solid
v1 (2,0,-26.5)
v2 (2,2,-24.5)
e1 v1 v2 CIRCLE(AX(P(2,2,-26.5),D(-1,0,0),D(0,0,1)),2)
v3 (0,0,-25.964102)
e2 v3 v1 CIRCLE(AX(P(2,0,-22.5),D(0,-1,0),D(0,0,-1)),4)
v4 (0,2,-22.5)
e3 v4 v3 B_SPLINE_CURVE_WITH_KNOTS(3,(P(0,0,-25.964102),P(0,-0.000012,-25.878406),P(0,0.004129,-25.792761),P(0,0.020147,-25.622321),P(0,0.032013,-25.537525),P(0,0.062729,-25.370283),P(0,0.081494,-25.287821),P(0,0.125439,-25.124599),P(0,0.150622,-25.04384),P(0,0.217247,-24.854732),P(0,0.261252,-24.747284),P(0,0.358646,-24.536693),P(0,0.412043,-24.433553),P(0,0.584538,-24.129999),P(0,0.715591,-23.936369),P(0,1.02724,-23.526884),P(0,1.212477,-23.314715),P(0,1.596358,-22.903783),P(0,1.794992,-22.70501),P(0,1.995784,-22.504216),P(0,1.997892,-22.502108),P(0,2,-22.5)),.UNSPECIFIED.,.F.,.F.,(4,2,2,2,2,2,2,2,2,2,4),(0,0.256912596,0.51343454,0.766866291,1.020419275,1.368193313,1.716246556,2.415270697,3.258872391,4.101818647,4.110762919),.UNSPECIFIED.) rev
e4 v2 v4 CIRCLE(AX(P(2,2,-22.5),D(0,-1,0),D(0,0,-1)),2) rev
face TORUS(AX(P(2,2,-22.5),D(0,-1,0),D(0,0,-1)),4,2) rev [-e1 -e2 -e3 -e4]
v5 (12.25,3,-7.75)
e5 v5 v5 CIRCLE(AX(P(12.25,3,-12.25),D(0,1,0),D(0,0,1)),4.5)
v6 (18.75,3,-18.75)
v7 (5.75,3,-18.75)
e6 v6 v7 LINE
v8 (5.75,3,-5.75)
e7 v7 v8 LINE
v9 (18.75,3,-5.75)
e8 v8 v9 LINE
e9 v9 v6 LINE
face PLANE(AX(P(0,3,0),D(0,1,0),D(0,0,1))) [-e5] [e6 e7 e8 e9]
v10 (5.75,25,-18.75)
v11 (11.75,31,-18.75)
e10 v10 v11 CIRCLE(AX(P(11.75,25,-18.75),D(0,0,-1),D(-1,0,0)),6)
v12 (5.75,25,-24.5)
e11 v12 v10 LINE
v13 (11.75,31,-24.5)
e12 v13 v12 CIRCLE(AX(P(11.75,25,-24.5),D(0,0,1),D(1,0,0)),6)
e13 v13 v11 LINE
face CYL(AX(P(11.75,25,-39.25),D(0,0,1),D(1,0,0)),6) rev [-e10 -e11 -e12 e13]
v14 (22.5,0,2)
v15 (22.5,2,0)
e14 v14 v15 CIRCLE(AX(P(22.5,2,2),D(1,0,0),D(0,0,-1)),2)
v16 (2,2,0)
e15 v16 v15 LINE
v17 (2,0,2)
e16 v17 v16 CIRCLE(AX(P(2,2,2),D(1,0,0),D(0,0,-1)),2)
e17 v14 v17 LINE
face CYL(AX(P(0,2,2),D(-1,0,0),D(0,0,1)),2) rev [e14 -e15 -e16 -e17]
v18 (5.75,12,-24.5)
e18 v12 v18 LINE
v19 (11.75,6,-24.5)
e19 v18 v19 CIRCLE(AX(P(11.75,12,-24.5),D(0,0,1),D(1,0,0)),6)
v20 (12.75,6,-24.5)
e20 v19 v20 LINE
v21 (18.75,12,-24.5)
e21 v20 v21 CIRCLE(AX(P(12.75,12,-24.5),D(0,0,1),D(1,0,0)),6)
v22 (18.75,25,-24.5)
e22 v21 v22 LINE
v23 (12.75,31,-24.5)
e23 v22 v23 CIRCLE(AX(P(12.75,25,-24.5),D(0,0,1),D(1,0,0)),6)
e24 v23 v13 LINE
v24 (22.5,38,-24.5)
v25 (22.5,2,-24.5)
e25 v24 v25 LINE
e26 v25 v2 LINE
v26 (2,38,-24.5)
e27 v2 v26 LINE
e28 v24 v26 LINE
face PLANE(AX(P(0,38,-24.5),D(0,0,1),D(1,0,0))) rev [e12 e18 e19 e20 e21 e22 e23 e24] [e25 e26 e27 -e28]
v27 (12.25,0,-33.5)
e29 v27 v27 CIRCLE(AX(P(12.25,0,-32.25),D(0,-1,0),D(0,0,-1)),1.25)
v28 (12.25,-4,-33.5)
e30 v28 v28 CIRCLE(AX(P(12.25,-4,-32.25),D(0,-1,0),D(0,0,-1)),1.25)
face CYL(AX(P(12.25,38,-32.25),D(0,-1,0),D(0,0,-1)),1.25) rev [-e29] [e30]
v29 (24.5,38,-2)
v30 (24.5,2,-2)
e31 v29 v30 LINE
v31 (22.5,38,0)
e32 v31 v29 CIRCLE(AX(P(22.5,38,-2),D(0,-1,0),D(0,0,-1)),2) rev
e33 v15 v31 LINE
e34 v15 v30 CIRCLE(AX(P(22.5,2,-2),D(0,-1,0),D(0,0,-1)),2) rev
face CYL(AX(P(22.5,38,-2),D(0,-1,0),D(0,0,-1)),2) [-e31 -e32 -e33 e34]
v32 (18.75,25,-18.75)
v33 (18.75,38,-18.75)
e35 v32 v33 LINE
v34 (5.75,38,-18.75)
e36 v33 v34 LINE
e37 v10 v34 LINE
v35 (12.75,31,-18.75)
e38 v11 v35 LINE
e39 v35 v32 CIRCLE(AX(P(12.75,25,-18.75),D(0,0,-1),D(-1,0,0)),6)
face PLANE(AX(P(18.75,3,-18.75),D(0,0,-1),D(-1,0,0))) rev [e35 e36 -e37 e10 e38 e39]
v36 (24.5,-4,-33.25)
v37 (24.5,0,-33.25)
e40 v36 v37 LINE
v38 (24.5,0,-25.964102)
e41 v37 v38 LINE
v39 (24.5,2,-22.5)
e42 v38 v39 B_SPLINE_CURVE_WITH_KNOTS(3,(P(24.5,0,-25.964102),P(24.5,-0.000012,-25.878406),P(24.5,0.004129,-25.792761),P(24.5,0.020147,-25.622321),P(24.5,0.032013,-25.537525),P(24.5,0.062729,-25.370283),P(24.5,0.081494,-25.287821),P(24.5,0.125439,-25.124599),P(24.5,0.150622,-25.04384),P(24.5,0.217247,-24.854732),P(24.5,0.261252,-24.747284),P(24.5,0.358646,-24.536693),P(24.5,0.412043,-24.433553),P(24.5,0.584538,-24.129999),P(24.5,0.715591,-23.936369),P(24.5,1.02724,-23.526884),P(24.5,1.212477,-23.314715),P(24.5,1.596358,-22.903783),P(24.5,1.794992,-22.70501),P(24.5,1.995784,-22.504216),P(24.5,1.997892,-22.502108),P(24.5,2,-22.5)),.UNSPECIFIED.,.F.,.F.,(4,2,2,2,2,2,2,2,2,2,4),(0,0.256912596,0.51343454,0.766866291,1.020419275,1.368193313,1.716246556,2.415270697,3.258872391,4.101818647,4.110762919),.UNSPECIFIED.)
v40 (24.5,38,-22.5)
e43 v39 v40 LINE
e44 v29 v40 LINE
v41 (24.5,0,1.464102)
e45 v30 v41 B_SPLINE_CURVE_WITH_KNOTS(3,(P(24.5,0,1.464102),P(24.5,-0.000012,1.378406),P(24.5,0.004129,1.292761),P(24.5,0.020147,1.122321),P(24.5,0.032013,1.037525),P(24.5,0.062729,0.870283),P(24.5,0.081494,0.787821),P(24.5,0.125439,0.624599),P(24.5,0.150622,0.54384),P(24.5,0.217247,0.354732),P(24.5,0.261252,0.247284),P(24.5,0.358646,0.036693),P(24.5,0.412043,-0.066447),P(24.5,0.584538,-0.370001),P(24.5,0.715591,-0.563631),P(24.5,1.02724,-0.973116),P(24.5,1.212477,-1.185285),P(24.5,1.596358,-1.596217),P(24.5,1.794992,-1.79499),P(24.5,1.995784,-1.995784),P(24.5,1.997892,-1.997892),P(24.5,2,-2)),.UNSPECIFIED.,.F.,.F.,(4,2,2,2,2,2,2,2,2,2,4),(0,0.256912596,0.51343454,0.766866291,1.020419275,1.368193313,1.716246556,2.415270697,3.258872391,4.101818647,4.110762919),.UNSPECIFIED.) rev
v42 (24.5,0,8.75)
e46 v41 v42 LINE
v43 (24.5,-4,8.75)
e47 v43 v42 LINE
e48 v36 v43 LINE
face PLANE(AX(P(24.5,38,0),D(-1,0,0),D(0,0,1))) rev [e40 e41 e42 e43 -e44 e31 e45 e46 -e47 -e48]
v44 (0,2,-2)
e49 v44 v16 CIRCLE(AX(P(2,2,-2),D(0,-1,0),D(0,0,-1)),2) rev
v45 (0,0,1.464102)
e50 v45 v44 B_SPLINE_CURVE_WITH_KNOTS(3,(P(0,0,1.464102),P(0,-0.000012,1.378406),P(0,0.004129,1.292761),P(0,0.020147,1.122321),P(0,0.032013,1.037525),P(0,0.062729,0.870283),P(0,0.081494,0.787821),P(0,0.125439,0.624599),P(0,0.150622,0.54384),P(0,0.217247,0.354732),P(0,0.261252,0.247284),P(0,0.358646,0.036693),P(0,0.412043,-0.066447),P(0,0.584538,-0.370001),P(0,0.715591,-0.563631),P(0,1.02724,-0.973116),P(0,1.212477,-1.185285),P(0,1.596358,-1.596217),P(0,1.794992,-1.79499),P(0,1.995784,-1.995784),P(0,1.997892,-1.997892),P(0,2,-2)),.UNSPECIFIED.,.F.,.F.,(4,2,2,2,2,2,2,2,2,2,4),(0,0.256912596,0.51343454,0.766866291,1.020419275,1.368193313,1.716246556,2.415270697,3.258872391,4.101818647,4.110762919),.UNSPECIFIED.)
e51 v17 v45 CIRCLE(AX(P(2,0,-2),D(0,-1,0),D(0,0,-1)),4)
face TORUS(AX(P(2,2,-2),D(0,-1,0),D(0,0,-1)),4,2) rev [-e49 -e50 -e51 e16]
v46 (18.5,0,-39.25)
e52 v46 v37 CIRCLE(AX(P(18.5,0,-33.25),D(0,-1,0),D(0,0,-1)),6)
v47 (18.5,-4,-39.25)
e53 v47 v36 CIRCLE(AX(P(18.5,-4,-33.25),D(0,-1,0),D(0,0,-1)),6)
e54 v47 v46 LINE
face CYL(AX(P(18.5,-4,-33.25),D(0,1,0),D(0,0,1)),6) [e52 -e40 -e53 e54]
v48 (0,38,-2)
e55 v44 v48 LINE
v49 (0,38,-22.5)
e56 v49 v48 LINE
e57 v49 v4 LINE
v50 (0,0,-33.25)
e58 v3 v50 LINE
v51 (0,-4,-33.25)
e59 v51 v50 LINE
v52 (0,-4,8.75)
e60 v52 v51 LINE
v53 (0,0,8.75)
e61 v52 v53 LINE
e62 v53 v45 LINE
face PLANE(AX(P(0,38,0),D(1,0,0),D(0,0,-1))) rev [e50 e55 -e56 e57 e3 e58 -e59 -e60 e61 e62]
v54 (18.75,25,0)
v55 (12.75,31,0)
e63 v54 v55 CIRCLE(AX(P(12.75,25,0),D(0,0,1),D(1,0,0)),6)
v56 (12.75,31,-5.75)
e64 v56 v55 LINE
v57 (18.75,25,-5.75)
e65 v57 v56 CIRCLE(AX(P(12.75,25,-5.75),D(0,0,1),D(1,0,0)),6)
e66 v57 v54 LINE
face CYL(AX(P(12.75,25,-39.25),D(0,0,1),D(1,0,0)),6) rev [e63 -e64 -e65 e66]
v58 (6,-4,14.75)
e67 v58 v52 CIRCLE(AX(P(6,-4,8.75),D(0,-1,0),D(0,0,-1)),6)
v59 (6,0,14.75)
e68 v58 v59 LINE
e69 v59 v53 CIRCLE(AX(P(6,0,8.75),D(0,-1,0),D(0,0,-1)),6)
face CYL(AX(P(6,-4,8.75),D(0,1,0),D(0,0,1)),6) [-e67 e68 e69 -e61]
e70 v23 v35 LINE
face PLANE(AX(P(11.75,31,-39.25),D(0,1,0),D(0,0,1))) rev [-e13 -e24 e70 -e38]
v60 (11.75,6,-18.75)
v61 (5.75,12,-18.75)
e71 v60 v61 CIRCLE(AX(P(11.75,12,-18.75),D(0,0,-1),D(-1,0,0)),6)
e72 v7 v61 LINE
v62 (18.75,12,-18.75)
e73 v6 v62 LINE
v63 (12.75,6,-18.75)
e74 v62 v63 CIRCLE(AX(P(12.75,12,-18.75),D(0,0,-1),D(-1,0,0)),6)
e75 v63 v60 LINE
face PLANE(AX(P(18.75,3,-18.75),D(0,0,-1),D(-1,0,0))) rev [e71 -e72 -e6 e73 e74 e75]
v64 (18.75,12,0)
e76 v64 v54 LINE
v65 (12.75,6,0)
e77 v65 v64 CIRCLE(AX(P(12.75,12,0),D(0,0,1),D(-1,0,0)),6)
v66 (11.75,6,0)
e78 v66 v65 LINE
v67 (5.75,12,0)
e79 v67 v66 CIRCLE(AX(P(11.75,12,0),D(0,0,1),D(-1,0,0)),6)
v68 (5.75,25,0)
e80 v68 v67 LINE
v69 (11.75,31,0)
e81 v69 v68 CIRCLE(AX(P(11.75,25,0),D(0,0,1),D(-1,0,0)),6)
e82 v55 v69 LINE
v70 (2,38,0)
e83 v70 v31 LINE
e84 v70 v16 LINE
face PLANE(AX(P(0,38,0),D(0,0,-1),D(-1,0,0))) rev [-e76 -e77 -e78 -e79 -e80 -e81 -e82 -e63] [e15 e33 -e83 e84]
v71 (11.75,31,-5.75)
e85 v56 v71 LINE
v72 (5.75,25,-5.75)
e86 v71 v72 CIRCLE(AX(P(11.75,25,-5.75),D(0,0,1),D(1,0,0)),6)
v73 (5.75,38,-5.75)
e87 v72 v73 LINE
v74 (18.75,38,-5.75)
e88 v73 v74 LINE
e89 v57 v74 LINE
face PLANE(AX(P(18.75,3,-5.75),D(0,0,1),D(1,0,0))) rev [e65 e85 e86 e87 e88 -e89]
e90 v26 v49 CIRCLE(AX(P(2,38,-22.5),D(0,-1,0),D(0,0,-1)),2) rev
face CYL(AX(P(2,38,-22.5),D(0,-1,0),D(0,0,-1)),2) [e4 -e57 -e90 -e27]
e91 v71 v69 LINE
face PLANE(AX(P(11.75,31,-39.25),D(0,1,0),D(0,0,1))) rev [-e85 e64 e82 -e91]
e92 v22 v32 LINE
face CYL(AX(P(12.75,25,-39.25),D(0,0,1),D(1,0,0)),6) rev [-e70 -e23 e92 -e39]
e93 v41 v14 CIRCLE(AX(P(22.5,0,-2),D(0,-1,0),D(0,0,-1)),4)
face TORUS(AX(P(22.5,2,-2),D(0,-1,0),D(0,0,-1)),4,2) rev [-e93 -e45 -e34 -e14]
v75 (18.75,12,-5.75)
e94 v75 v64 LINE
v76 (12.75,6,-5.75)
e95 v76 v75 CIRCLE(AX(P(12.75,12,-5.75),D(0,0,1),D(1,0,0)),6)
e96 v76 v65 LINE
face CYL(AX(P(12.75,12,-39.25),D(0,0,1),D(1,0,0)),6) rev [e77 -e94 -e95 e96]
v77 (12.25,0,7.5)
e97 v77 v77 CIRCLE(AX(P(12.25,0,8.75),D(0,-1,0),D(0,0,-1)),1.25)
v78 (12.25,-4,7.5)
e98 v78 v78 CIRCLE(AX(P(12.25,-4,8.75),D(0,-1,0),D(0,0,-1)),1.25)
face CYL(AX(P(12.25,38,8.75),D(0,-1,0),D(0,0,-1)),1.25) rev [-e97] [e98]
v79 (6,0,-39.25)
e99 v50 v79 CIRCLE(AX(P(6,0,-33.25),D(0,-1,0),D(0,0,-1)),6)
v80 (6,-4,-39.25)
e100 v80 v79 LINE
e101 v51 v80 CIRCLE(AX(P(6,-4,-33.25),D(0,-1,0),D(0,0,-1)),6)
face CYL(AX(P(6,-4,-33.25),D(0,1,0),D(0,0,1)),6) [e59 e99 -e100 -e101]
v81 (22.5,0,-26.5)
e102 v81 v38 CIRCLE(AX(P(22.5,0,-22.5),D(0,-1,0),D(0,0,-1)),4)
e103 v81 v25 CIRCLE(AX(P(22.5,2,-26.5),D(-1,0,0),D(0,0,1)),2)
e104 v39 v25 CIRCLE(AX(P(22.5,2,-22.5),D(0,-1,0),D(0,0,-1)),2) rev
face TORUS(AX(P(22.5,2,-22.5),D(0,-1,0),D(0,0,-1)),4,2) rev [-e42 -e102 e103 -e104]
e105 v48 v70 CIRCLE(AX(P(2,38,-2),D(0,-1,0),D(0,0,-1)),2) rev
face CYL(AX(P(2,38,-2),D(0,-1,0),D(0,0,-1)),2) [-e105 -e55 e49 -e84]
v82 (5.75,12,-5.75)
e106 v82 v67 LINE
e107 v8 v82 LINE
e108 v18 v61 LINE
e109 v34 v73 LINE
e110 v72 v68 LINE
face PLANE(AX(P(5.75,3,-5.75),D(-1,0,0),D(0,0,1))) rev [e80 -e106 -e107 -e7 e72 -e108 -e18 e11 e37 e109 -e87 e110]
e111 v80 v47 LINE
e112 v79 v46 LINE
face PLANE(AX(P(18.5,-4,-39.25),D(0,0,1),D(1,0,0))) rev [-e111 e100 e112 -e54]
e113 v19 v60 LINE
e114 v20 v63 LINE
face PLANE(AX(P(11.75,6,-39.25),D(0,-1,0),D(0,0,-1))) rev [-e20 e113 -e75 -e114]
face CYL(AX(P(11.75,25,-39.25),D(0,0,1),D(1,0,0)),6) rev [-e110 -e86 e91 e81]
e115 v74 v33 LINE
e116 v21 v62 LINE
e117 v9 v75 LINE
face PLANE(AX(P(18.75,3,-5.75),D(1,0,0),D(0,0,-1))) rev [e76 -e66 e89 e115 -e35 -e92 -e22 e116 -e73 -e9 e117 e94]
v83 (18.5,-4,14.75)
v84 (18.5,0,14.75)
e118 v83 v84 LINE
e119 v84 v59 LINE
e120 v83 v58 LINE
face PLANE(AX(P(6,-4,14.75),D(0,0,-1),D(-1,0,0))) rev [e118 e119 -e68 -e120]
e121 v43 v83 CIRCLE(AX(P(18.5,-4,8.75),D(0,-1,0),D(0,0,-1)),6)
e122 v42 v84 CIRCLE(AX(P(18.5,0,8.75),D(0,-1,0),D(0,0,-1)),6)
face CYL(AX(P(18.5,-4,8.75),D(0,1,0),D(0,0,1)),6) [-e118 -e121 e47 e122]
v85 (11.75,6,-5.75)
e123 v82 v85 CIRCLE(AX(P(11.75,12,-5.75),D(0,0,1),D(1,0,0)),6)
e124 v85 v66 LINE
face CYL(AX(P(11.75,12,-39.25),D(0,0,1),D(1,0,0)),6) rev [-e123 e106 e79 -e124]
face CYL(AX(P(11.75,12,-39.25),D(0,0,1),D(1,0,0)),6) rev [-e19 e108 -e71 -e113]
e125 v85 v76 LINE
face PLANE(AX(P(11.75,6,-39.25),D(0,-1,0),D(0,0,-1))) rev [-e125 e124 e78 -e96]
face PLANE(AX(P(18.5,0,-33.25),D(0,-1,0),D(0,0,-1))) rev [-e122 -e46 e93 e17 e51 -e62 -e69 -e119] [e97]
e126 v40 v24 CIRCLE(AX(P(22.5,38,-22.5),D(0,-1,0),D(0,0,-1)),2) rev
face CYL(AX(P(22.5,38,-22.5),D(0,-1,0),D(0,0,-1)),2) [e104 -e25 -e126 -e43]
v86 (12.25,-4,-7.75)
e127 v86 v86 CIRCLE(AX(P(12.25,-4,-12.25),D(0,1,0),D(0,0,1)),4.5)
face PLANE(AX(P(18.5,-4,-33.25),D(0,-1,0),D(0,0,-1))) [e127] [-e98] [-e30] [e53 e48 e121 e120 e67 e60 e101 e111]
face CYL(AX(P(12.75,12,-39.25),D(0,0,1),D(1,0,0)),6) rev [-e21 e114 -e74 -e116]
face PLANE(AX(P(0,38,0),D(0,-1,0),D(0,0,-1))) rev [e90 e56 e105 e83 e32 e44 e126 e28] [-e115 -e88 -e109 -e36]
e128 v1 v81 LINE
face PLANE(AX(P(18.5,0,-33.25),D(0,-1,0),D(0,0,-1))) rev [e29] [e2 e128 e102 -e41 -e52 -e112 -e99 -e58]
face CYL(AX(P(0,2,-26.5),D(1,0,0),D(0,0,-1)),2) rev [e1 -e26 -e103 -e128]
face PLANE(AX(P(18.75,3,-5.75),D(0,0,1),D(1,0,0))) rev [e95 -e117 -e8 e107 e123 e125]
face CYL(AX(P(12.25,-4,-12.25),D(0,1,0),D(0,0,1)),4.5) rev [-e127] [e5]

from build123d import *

# Parameters (mm, degrees)
SKETCH_1_W          = 24.5
SKETCH_1_H          = 24.5
EXTRUDE_1_DEPTH     = 38
EXTRUDE_2_DEPTH     = 4
SKETCH_3_W          = 13
SKETCH_3_H          = 13
CUT_EXTRUDE_1_DEPTH = 35
SKETCH_4_R          = 4.5
CUT_EXTRUDE_2_DEPTH = 59.015622896
CUT_EXTRUDE_3_DEPTH = 60.873303734
FILLET_1_R          = 2
SKETCH_6_R          = 1.25
CUT_EXTRUDE_4_DEPTH = 63.488498942
FILLET_2_R          = 2


with BuildPart() as part:
    # Эскиз1 → Бобышка-Вытянуть1 (new body)
    with BuildSketch(Plane(origin=(0, 0, 0), x_dir=(1, 0, 0), z_dir=(0, 1, 0))):
        with Locations((12.25, 12.25)):
            Rectangle(SKETCH_1_W, SKETCH_1_H)
    extrude(amount=EXTRUDE_1_DEPTH)

    # Эскиз2 → Бобышка-Вытянуть2 (add)
    with BuildSketch(Plane.XZ):
        with BuildLine():
            Line((24.5, -24.5), (24.5, -33.25))
            ThreePointArc((24.5, -33.25), (22.742640687, -37.492640687), (18.5, -39.25))
            Line((18.5, -39.25), (6, -39.25))
            ThreePointArc((6, -39.25), (1.757359313, -37.492640687), (0, -33.25))
            Line((0, -33.25), (0, -24.5))
            Line((0, -24.5), (0, 0))
            Line((0, 0), (0, 8.75))
            ThreePointArc((0, 8.75), (1.757359313, 12.992640687), (6, 14.75))
            Line((6, 14.75), (18.5, 14.75))
            ThreePointArc((18.5, 14.75), (22.742640687, 12.992640687), (24.5, 8.75))
            Line((24.5, 8.75), (24.5, 0))
            Line((24.5, 0), (24.5, -24.5))
        make_face()
    extrude(amount=EXTRUDE_2_DEPTH)

    # Эскиз3 → Вырез-Вытянуть1 (cut)
    with BuildSketch(Plane(origin=(0, 38, 0), x_dir=(1, 0, 0), z_dir=(0, 1, 0))):
        with Locations((12.25, 12.25)):
            Rectangle(SKETCH_3_W, SKETCH_3_H)
    extrude(amount=-CUT_EXTRUDE_1_DEPTH, mode=Mode.SUBTRACT)

    # Эскиз4 → Вырез-Вытянуть2 (cut, through all)
    with BuildSketch(Plane(origin=(0, 3, 0), x_dir=(1, 0, 0), z_dir=(0, 1, 0))):
        with Locations(Location((12.25, 12.25, 0), (0, 0, 270))):
            Circle(SKETCH_4_R)
    extrude(amount=-CUT_EXTRUDE_2_DEPTH, mode=Mode.SUBTRACT)

    # Эскиз5 → Вырез-Вытянуть3 (cut, through all)
    with BuildSketch(Plane.XY):
        with BuildLine():
            Line((11.75, 31), (12.75, 31))
            ThreePointArc((12.75, 31), (16.992640687, 29.242640687), (18.75, 25))
            Line((18.75, 25), (18.75, 12))
            ThreePointArc((18.75, 12), (16.992640687, 7.757359313), (12.75, 6))
            Line((12.75, 6), (11.75, 6))
            ThreePointArc((11.75, 6), (7.507359313, 7.757359313), (5.75, 12))
            Line((5.75, 12), (5.75, 25))
            ThreePointArc((5.75, 25), (7.507359313, 29.242640687), (11.75, 31))
        make_face()
    extrude(amount=-CUT_EXTRUDE_3_DEPTH, mode=Mode.SUBTRACT)

    # Скругление1
    fillet_1_edges = [part.edges().sort_by_distance(p)[0] for p in [
        (0, 19, -24.5),
        (0, 19, 0),
        (24.5, 19, -24.5),
        (24.5, 19, 0),
    ]]
    fillet(fillet_1_edges, radius=FILLET_1_R)

    # Эскиз6 → Вырез-Вытянуть4 (cut, through all)
    with BuildSketch(Plane.XZ.offset(4)):
        with Locations(Location((12.25, 8.75, 0), (0, 0, 270))):
            Circle(SKETCH_6_R)
        with Locations(Location((12.25, -32.25, 0), (0, 0, 270))):
            Circle(SKETCH_6_R)
    extrude(amount=-CUT_EXTRUDE_4_DEPTH, mode=Mode.SUBTRACT)

    # Скругление2
    # the kernel refuses this fillet: 2 mm, written as the material it adds along each edge
    with BuildSketch(Plane(origin=(22.5, 0, -22.5), x_dir=(-0.8017442392976493, 0, 0.5976672776328263), z_dir=(-0.5976672776328263, 0, -0.8017442392976493))) as fillet_2_piece_1_section:
        with BuildLine():
            CenterArc((2 + FILLET_2_R, FILLET_2_R), FILLET_2_R, 180, 90)
            Line((2, FILLET_2_R), (2, 0))
            Line((2, 0), (2 + FILLET_2_R, 0))
        make_face()
    fillet_2_piece_1 = revolve(axis=Axis((22.5, 0, -22.5), (0, 1, 0)), revolution_arc=233.296989237, mode=Mode.PRIVATE)
    fillet_2_piece_1 = split(fillet_2_piece_1, bisect_by=Plane(origin=(24.5, 0.623256616, -23.99987789), z_dir=(-1, 0, 0)), keep=Keep.TOP, mode=Mode.PRIVATE)
    add(fillet_2_piece_1)
    with BuildSketch(Plane(origin=(2, 0, -22.5), x_dir=(0, 0, -1), z_dir=(1, 0, 0))) as fillet_2_piece_2_section:
        with BuildLine():
            CenterArc((2 + FILLET_2_R, FILLET_2_R), FILLET_2_R, 180, 90)
            Line((2, FILLET_2_R), (2, 0))
            Line((2, 0), (2 + FILLET_2_R, 0))
        make_face()
    fillet_2_piece_2 = revolve(axis=Axis((2, 0, -22.5), (0, 1, 0)), revolution_arc=233.296989237, mode=Mode.PRIVATE)
    fillet_2_piece_2 = split(fillet_2_piece_2, bisect_by=Plane(origin=(0, 0.334600406, -24.939550499), z_dir=(1, 0, 0)), keep=Keep.TOP, mode=Mode.PRIVATE)
    add(fillet_2_piece_2)
    with BuildSketch(Plane(origin=(2, 0, -2), x_dir=(0, 0, 1), z_dir=(1, 0, 0))) as fillet_2_piece_3_section:
        with BuildLine():
            CenterArc((2 + FILLET_2_R, -FILLET_2_R), FILLET_2_R, 90, 90)
            Line((2, -FILLET_2_R), (2, 0))
            Line((2, 0), (2 + FILLET_2_R, 0))
        make_face()
    fillet_2_piece_3 = revolve(axis=Axis((2, 0, -2), (0, -1, 0)), revolution_arc=233.296989237, mode=Mode.PRIVATE)
    fillet_2_piece_3 = split(fillet_2_piece_3, bisect_by=Plane(origin=(0, 0.334600403, 0.439550497), z_dir=(1, 0, 0)), keep=Keep.TOP, mode=Mode.PRIVATE)
    add(fillet_2_piece_3)
    with BuildSketch(Plane(origin=(22.5, 0, -2), x_dir=(-0.801744239297648, 0, -0.5976672776328278), z_dir=(-0.5976672776328278, 0, 0.801744239297648))) as fillet_2_piece_4_section:
        with BuildLine():
            CenterArc((2 + FILLET_2_R, -FILLET_2_R), FILLET_2_R, 90, 90)
            Line((2 + FILLET_2_R, 0), (2, 0))
            Line((2, 0), (2, -FILLET_2_R))
        make_face()
    fillet_2_piece_4 = revolve(axis=Axis((22.5, 0, -2), (0, -1, 0)), revolution_arc=233.296989237, mode=Mode.PRIVATE)
    fillet_2_piece_4 = split(fillet_2_piece_4, bisect_by=Plane(origin=(24.5, 0.623256909, -0.500122227), z_dir=(-1, 0, 0)), keep=Keep.TOP, mode=Mode.PRIVATE)
    add(fillet_2_piece_4)
    with BuildSketch(Plane(origin=(22.5, 0, -24.5), x_dir=(0, 0, -1), z_dir=(-1, 0, 0)), Plane(origin=(2, 0, 0), x_dir=(0, 0, 1), z_dir=(1, 0, 0))) as fillet_2_piece_5:
        with BuildLine():
            CenterArc((FILLET_2_R, -FILLET_2_R), FILLET_2_R, 90, 90)
            Line((0, -FILLET_2_R), (0, 0))
            Line((0, 0), (FILLET_2_R, 0))
        make_face()
    extrude(amount=20.5)


solid = part.part
